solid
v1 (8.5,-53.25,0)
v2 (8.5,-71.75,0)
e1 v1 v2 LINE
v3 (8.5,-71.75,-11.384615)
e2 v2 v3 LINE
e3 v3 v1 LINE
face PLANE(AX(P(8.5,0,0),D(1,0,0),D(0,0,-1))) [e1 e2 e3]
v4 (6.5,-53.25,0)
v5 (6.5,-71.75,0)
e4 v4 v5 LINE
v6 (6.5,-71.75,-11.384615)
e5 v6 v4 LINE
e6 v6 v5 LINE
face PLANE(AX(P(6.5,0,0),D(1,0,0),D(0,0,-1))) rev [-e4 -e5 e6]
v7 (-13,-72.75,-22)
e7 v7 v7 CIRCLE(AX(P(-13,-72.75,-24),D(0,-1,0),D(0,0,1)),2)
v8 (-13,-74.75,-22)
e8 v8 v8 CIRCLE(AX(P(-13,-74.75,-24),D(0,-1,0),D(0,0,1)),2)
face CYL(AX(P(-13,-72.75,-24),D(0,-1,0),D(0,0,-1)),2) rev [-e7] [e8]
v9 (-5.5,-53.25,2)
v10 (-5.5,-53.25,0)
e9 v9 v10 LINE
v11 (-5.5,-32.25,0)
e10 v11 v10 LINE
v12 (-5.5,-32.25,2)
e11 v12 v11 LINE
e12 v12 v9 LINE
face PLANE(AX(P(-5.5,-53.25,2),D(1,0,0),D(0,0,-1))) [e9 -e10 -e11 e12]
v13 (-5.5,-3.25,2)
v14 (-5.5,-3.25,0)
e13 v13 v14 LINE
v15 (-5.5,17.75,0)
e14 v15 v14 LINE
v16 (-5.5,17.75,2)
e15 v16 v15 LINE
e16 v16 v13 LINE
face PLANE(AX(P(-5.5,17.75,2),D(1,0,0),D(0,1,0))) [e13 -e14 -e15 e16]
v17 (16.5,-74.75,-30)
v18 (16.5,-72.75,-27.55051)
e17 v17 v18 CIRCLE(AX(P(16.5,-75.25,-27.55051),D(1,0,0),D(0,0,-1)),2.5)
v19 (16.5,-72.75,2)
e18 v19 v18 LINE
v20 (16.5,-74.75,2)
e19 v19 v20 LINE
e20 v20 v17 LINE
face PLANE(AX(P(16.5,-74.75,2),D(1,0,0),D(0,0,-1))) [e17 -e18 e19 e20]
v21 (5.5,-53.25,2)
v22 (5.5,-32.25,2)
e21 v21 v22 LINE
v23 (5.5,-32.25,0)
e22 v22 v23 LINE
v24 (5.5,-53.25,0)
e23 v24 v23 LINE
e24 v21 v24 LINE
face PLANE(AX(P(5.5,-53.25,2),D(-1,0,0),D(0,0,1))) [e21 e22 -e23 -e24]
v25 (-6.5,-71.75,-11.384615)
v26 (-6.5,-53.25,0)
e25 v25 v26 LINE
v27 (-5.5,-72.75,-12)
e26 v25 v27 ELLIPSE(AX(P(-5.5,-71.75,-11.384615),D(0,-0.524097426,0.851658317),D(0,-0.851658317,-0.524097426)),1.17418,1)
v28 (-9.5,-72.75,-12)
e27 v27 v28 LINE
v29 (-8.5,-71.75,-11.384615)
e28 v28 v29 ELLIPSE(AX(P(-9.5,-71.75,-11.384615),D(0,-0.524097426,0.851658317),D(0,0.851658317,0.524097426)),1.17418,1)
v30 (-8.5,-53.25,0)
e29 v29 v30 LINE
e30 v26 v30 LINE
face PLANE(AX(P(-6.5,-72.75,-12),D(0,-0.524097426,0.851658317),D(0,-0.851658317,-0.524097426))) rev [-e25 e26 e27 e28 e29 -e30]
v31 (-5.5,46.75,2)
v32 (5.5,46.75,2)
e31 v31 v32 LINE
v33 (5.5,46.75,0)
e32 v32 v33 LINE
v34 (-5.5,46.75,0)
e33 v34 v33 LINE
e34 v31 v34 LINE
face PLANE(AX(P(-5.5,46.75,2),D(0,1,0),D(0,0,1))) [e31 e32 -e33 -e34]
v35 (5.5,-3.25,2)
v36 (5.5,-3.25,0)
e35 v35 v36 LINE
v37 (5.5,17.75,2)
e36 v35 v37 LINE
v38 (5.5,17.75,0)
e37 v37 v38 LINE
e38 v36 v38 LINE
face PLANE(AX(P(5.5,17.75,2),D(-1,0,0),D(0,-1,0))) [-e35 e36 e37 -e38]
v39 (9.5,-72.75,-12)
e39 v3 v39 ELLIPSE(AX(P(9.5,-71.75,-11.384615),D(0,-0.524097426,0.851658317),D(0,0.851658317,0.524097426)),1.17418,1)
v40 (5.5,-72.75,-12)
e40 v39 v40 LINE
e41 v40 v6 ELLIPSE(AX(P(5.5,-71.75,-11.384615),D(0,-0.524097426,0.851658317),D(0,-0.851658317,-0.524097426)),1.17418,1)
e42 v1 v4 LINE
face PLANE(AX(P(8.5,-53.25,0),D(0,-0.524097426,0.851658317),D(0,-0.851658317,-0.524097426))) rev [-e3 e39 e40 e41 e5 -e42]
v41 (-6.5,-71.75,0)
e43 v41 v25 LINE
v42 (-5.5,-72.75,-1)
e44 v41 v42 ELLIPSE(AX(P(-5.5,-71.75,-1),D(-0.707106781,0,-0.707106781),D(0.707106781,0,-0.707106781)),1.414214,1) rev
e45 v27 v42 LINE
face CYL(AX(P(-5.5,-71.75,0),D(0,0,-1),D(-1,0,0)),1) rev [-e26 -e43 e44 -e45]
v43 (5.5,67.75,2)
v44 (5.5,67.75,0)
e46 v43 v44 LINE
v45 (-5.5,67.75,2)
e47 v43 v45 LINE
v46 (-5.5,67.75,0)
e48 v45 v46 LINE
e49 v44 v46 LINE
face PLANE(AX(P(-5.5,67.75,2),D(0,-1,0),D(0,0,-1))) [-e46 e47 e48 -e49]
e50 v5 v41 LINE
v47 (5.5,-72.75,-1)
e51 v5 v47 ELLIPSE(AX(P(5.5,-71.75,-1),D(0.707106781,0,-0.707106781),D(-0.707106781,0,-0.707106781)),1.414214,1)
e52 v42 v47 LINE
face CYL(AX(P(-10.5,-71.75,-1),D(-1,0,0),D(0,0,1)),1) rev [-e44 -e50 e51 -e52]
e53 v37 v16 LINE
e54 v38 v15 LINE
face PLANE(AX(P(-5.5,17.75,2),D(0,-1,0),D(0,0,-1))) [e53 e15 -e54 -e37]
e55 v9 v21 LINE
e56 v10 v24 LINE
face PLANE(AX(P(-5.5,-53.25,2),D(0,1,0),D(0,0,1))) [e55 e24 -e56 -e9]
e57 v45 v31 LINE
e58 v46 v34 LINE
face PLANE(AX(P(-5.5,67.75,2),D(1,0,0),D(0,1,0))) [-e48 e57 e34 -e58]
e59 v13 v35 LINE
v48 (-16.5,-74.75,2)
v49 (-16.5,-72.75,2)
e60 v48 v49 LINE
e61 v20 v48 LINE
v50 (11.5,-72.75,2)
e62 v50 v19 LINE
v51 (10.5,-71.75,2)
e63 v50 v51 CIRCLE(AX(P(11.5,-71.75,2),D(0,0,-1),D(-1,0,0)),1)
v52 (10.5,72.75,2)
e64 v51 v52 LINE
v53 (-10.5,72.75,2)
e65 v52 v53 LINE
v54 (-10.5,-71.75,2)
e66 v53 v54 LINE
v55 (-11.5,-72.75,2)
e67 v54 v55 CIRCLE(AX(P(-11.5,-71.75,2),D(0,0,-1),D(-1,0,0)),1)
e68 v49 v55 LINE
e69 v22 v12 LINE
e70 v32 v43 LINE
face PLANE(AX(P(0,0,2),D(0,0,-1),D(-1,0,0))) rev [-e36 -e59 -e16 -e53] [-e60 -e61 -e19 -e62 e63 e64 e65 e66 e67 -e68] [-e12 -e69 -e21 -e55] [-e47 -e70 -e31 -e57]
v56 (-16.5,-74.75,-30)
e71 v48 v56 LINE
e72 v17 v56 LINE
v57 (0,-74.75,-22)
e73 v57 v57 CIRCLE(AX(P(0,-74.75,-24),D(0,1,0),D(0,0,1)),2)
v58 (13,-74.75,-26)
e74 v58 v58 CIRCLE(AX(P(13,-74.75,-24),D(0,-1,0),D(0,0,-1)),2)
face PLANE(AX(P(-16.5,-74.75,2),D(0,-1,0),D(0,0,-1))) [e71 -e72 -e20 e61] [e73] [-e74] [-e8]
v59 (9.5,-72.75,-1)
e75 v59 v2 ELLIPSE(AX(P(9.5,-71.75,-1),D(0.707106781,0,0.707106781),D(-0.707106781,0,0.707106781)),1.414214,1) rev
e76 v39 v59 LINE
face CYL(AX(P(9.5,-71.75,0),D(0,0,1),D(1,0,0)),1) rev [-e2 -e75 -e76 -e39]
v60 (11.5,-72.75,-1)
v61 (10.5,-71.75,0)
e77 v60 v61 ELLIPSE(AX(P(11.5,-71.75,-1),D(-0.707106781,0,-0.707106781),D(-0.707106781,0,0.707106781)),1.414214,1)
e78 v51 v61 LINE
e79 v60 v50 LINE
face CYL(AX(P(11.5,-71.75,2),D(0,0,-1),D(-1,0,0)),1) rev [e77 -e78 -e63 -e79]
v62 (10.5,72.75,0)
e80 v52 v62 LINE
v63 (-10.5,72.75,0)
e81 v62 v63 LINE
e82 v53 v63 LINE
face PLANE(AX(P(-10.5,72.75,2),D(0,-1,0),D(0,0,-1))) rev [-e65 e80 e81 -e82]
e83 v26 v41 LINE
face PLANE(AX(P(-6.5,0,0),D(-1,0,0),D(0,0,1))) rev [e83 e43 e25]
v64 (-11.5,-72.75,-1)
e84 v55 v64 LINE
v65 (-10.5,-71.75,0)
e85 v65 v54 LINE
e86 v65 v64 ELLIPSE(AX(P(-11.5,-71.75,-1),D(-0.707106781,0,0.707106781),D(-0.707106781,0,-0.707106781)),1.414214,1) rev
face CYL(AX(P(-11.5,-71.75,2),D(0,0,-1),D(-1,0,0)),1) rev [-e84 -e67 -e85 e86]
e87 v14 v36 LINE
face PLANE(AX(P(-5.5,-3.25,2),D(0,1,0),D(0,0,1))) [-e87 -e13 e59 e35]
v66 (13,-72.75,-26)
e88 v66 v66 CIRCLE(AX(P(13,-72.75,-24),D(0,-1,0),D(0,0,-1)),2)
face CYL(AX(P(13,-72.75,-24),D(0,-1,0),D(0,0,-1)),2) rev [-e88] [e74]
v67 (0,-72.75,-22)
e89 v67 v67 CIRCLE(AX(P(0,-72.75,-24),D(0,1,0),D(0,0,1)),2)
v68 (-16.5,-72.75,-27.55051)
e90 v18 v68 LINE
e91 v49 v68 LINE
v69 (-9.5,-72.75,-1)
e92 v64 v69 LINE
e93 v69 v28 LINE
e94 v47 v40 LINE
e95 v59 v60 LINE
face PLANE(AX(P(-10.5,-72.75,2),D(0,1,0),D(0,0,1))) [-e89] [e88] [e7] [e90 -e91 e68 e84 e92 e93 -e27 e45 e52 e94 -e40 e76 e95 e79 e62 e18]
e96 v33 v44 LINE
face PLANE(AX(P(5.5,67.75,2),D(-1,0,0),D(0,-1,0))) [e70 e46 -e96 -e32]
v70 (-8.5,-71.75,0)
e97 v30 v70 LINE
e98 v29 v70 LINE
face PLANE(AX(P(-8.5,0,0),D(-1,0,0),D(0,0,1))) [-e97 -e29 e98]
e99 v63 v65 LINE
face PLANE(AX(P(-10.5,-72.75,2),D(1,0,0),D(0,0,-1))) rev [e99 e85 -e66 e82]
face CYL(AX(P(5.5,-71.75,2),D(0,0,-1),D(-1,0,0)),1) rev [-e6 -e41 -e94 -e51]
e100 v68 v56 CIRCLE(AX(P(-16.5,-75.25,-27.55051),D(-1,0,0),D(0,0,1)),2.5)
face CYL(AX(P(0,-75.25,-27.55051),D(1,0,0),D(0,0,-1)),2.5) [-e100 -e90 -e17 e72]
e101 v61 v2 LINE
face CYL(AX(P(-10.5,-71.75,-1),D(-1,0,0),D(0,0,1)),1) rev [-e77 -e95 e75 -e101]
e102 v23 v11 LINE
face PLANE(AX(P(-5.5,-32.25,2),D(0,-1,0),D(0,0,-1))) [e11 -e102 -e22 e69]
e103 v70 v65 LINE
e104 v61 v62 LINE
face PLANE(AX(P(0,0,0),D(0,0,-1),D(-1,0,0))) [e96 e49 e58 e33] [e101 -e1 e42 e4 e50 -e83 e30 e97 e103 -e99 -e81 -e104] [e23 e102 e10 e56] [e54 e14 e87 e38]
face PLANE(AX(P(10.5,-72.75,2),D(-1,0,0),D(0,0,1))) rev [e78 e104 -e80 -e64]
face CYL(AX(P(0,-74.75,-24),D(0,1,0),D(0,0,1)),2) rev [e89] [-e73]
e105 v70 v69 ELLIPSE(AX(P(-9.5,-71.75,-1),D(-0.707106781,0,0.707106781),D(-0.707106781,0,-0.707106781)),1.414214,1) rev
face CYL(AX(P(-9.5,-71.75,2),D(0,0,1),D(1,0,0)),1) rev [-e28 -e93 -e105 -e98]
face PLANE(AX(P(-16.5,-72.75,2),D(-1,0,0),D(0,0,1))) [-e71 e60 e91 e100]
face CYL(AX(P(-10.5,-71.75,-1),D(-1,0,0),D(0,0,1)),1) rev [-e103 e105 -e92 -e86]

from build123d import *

# Parameters (mm, degrees)
SKETCH1_W                = 21
SKETCH1_H                = 145.5
SKETCH1_W_2              = 11
SKETCH1_H_2              = 21
BOSS_EXTRUDE1_DEPTH      = 2
BOSS_EXTRUDE2_DEPTH      = 30
BOSS_EXTRUDE2_DEPTH_BACK = 2
FILLET2_R                = 2.5
SKETCH6_R                = 2
CUT_EXTRUDE1_DEPTH       = 2
BOSS_EXTRUDE5_DEPTH      = 1
BOSS_EXTRUDE6_DEPTH      = 1
SKETCH9_R                = 2
CUT_EXTRUDE2_DEPTH       = 2
FILLET3_R                = 1


with BuildPart() as part:
    # Sketch1 → Boss-Extrude1 (new body)
    with BuildSketch(Plane.XY):
        Rectangle(SKETCH1_W, SKETCH1_H)
        with Locations((0, -42.75)):
            Rectangle(SKETCH1_W_2, SKETCH1_H_2, mode=Mode.SUBTRACT)
        with Locations((0, 7.25)):
            Rectangle(SKETCH1_W_2, SKETCH1_H_2, mode=Mode.SUBTRACT)
        with Locations((0, 57.25)):
            Rectangle(SKETCH1_W_2, SKETCH1_H_2, mode=Mode.SUBTRACT)
    extrude(amount=BOSS_EXTRUDE1_DEPTH)

    # Sketch2 → Boss-Extrude2 (add, two sides: drawn at the far end of the back side and taken through both)
    with BuildSketch(Plane(origin=(0, 0, 0), x_dir=(-1, 0, 0), z_dir=(0, 0, -1)).offset(-BOSS_EXTRUDE2_DEPTH_BACK)):
        Polygon((10.5, -72.75), (16.5, -72.75), (16.5, -74.75), (-16.5, -74.75), (-16.5, -72.75), align=None)
    extrude(amount=BOSS_EXTRUDE2_DEPTH + BOSS_EXTRUDE2_DEPTH_BACK)

    # Fillet2
    # the kernel refuses this fillet: 2.5 mm, written as the material it takes off along each edge
    with BuildSketch(Plane(origin=(22.623724357, -72.75, -30), x_dir=(0, 0, 1), z_dir=(-1, 0, 0))) as fillet2_piece_1:
        with BuildLine():
            CenterArc((2.449489743, -2.5), FILLET2_R, 90, 78.463040967)
            Line((0, -2), (-0.048989795, -1.99))
            ThreePointArc((-0.048989795, -1.99), (-0.05, -1), (-0.05, 0))
            Line((-0.05, 0), (0, 0.05))
            Line((0, 0.05), (2.449489743, 0.05))
            Line((2.449489743, 0.05), (2.449489743, 0))
        make_face()
    extrude(amount=45.247448714, mode=Mode.SUBTRACT)

    # Sketch6 → Cut-Extrude1 (cut)
    with BuildSketch(Plane(origin=(0, -72.75, 0), x_dir=(1, 0, 0), z_dir=(0, 1, 0))):
        with Locations(Location((0, 24, 0), (0, 0, 270))):
            Circle(SKETCH6_R)
    extrude(amount=-CUT_EXTRUDE1_DEPTH, mode=Mode.SUBTRACT)

    # Sketch7 → Boss-Extrude5 (add, symmetric)
    with BuildSketch(Plane(origin=(7.5, 0, 0), x_dir=(0, 0, -1), z_dir=(1, 0, 0))):
        Polygon((0, -53.25), (12, -72.75), (0, -72.75), align=None)
    extrude(amount=BOSS_EXTRUDE5_DEPTH, both=True)

    # Sketch8 → Boss-Extrude6 (add, symmetric)
    with BuildSketch(Plane(origin=(-7.5, 0, 0), x_dir=(0, 0, -1), z_dir=(1, 0, 0))):
        Polygon((12, -72.75), (0, -53.25), (0, -72.75), align=None)
    extrude(amount=BOSS_EXTRUDE6_DEPTH, both=True)

    # Sketch9 → Cut-Extrude2 (cut)
    with BuildSketch(Plane.XZ.offset(74.75)):
        with Locations(Location((13, -24, 0), (0, 0, 270))):
            Circle(SKETCH9_R)
        with Locations(Location((-13, -24, 0), (0, 0, 90))):
            Circle(SKETCH9_R)
    extrude(amount=-CUT_EXTRUDE2_DEPTH, mode=Mode.SUBTRACT)

    # Fillet3
    fillet3_edges = [part.edges().sort_by_distance(p)[0] for p in [
        (-9.5, -72.75, 0),
        (10.5, -72.75, 1),
        (-10.5, -72.75, 1),
        (9.5, -72.75, 0),
        (6.5, -72.75, -6),
        (8.5, -72.75, -6),
        (0, -72.75, 0),
        (-8.5, -72.75, -6),
        (-6.5, -72.75, -6),
    ]]
    fillet(fillet3_edges, radius=FILLET3_R)


solid = part.part
